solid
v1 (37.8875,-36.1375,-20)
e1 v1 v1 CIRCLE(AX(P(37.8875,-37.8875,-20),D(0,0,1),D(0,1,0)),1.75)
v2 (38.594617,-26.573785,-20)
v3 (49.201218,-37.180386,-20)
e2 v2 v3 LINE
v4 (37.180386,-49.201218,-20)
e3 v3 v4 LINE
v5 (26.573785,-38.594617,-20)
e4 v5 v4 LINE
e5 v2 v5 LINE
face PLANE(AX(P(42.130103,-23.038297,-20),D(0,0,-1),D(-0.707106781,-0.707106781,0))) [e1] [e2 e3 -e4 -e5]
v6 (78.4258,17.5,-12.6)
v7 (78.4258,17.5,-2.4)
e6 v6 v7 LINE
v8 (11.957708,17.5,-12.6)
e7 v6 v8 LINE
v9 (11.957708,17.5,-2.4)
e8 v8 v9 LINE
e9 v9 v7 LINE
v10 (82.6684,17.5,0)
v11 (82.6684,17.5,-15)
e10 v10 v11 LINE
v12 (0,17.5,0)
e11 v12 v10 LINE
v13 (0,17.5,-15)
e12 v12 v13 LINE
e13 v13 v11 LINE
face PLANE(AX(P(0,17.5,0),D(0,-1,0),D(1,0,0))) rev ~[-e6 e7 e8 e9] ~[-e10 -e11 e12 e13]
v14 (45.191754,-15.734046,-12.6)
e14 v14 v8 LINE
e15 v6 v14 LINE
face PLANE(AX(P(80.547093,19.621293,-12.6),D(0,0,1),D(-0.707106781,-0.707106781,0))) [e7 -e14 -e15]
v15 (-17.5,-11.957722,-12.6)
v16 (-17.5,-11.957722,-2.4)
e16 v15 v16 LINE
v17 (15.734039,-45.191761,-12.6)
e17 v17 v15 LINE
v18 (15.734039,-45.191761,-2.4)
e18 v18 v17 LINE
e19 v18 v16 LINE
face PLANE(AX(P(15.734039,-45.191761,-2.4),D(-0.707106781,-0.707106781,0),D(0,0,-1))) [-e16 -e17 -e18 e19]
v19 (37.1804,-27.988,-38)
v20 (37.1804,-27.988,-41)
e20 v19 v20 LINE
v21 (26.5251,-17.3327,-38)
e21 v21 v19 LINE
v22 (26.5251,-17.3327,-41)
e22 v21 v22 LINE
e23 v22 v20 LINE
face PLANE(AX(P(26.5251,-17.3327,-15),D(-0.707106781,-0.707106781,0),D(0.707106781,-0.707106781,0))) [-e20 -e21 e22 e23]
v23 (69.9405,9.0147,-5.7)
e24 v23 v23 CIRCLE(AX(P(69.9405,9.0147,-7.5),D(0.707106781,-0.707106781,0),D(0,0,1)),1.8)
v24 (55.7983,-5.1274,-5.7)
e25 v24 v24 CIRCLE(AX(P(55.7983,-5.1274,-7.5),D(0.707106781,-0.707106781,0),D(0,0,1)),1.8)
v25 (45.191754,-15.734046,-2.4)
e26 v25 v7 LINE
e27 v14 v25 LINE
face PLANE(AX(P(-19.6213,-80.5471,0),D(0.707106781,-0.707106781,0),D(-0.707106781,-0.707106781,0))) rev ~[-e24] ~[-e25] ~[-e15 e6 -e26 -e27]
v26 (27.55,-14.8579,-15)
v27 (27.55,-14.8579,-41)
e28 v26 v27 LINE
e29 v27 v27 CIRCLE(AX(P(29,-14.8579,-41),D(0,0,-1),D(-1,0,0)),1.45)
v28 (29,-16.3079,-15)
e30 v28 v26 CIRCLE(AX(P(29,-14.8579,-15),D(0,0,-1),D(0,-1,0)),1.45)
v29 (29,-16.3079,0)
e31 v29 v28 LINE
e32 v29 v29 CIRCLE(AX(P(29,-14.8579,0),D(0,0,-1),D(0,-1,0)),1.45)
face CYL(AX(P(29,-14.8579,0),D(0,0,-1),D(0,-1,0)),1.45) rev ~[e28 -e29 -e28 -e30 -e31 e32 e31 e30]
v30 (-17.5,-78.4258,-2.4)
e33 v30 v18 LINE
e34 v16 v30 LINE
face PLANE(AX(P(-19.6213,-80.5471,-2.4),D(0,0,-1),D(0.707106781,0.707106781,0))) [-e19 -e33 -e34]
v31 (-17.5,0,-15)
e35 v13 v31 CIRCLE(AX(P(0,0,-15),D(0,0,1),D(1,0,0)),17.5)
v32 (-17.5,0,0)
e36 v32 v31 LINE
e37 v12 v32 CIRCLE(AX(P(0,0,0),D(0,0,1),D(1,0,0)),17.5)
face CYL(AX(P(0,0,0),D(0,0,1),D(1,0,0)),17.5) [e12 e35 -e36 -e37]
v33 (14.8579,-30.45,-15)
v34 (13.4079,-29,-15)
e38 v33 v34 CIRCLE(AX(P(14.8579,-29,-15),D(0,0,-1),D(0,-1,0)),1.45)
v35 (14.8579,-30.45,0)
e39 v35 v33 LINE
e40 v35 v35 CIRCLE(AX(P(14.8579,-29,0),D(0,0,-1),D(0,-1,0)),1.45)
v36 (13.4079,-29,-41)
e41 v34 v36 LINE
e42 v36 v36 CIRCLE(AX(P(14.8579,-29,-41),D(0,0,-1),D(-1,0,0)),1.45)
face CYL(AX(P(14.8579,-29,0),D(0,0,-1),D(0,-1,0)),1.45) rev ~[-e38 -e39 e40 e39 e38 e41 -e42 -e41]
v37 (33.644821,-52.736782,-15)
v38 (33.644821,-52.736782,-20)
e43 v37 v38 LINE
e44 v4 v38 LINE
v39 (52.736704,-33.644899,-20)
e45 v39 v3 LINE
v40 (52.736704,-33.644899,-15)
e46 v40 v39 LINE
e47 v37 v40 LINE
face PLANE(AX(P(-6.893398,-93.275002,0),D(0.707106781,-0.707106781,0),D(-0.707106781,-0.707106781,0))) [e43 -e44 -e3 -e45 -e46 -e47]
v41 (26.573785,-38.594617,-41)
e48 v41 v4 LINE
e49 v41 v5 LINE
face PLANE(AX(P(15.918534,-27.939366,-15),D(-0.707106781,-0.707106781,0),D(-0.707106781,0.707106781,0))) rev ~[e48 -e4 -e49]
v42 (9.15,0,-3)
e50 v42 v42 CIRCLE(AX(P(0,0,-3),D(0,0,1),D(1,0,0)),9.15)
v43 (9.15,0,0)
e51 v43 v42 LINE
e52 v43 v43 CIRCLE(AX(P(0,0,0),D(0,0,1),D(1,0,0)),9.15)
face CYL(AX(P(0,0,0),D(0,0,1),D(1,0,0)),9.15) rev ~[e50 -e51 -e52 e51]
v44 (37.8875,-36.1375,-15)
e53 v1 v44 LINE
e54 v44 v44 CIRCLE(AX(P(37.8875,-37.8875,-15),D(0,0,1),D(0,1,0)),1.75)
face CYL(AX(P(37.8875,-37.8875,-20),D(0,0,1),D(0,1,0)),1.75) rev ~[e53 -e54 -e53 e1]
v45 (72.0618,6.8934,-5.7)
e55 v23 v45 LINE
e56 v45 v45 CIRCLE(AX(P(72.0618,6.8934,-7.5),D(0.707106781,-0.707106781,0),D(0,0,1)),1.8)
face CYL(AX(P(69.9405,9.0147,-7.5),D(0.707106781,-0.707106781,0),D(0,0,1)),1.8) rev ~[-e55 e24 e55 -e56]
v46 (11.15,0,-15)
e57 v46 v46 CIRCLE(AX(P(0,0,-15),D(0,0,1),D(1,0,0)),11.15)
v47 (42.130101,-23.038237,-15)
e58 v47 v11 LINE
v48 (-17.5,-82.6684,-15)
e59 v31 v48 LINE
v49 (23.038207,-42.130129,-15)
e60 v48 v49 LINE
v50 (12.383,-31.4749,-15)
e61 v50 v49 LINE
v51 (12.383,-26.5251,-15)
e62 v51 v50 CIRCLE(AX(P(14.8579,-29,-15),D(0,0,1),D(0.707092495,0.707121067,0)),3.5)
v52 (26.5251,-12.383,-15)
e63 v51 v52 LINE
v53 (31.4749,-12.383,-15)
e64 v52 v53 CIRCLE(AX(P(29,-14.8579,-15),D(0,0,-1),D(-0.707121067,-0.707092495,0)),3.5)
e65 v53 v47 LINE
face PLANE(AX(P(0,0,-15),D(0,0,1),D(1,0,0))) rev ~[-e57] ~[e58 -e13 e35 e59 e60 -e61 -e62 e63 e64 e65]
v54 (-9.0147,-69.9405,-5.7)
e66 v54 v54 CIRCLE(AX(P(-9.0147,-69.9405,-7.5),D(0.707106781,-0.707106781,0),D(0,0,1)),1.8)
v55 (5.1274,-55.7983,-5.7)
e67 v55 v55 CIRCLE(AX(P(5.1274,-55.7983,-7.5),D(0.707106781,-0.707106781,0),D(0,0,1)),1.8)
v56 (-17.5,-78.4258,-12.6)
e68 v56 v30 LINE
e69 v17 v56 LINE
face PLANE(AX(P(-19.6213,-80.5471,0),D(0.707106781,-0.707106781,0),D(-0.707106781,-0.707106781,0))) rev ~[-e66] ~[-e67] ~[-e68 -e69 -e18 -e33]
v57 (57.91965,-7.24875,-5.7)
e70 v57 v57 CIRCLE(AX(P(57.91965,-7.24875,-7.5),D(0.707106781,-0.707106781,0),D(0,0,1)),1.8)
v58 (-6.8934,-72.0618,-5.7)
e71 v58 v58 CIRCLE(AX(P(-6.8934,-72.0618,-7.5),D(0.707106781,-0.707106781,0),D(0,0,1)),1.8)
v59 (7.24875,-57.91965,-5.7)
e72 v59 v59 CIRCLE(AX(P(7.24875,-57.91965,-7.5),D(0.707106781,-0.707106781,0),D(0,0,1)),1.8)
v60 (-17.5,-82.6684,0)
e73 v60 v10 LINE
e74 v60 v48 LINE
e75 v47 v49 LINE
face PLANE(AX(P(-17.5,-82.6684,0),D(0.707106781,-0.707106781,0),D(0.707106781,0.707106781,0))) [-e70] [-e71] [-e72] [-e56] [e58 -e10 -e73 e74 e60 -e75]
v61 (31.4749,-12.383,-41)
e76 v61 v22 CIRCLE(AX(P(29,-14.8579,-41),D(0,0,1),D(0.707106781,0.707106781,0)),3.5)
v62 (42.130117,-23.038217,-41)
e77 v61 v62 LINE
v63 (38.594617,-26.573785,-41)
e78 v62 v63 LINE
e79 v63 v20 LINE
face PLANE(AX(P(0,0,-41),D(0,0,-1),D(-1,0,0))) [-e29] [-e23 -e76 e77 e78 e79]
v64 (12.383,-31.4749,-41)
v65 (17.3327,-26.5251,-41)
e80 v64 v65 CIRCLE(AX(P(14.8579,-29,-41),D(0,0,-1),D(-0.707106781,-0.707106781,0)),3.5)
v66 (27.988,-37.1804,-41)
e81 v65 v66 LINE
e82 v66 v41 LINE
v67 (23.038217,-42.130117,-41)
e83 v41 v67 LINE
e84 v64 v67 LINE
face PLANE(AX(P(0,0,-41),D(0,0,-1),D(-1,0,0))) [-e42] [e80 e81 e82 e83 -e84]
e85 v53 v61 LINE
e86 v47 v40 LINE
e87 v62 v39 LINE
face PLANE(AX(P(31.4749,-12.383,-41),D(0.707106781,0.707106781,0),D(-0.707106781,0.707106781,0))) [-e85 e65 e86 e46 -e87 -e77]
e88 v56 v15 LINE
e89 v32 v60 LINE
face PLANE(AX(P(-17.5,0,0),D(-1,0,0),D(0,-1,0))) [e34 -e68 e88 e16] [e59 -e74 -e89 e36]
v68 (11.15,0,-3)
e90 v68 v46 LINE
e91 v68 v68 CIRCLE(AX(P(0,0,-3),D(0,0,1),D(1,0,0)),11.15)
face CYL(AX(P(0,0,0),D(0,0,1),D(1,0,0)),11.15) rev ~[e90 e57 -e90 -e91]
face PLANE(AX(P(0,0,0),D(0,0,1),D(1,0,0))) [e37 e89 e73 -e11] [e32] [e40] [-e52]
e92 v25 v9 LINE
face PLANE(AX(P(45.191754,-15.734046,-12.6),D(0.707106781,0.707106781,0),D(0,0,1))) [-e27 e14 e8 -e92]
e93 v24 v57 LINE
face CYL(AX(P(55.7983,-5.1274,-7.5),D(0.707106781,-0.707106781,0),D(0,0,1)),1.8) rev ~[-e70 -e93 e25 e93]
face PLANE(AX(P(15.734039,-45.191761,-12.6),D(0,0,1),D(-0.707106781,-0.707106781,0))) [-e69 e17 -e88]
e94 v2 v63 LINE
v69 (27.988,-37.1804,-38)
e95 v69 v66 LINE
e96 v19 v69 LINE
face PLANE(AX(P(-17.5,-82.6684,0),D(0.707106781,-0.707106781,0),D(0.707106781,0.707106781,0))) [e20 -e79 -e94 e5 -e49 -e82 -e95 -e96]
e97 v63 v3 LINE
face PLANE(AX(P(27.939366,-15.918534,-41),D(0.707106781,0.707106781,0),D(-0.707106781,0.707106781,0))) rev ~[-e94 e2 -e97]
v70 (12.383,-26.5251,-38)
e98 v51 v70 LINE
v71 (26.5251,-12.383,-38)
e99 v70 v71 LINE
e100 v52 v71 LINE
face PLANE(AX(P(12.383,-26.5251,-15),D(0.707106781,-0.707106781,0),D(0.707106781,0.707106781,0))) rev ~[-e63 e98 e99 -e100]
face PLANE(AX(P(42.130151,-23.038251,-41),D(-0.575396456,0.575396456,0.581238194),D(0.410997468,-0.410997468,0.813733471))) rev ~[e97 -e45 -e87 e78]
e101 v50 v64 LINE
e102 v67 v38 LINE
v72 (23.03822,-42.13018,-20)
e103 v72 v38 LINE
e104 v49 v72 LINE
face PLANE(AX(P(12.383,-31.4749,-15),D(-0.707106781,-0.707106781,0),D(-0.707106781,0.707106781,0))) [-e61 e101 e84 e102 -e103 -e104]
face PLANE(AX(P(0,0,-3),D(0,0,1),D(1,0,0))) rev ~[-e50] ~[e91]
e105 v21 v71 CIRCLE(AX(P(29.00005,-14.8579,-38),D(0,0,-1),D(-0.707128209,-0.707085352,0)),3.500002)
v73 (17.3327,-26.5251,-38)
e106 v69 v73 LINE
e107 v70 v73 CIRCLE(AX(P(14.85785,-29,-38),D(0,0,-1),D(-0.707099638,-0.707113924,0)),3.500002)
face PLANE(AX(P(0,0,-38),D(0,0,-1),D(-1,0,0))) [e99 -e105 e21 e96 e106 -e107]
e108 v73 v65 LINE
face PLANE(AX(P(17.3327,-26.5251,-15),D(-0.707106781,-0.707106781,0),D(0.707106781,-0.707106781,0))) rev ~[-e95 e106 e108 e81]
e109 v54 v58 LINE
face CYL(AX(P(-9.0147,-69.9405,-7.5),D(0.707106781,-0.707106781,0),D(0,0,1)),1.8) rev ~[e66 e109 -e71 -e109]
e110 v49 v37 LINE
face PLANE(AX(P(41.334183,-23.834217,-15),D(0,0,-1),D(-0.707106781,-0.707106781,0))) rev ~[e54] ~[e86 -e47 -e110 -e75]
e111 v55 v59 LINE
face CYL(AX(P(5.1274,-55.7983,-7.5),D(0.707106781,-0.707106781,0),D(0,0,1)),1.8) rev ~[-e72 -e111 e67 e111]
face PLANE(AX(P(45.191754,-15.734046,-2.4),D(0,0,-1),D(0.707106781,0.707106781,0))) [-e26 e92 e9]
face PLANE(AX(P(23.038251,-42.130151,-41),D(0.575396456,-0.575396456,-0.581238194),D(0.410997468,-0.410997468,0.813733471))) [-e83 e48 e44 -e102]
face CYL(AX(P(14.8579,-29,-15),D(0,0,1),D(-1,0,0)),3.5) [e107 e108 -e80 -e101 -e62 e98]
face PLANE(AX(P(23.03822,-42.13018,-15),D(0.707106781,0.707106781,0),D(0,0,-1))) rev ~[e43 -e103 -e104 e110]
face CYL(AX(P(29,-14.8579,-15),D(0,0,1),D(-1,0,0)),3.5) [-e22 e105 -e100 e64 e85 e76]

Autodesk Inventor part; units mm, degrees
ref_plane "YZ Plane" through (0, 0, 0) normal (1, 0, 0) x (0, 1, 0)
ref_plane "XZ Plane" through (0, 0, 0) normal (0, 1, 0) x (-1, 0, 0)
ref_plane "XY Plane" through (0, 0, 0) normal (0, 0, 1) x (1, 0, 0)
sketch "Sketch1" plane through (0, 0, 0) normal (0, 0, 1) x (1, 0, 0)
  circle A0 centre (0, 0) radius 4 projected
  line L0 (-144.1925, -209.3609) -> (209.3609, 144.1925) projected
  circle A1 centre (0, 0) radius 11.15
  circle A2 centre (0, 0) radius 17.5
  line L1 (-17.5, 0) -> (-17.5, -82.6684)
  line L2 (0, 17.5) -> (82.6684, 17.5)
  point P0 (0, 0)
  dimension "d0" = 22.3
  dimension "d1" = 35
extrude "Extrusion1" add sketch "Sketch1" against normal blind 15 contours L1 A2 L2 L0 | A2
sketch "Sketch2" plane through (0, 0, 0) normal (0, 0, 1) x (1, 0, 0)
  arc A0 (0, 17.5) -> (-17.5, 0) centre (0, 0) ccw projected
  line L0 (-17.5, 0) -> (-17.5, -82.6684) projected
  line L1 (-17.5, -82.6684) -> (82.6684, 17.5) projected
  line L2 (82.6684, 17.5) -> (0, 17.5) projected
  circle A1 centre (0, 0) radius 11.15 projected
  circle A2 centre (0, 0) radius 9.15
  dimension "d6" = 2
extrude "Extrusion2" add sketch "Sketch2" against normal blind 3 contours A1
ref_plane "Work Plane1" through (-19.6213, -80.5471, 0) normal (0.7071068, -0.7071068, 0) x (-0.7071068, -0.7071068, 0)
sketch "Sketch3" plane through (-19.6213, -80.5471, 0) normal (0.7071068, -0.7071068, 0) x (-0.7071068, -0.7071068, 0)
  line L0 (-141.6595, 0) -> (-83.2041, 0) projected
  line L1 (-141.6595, 0) -> (-141.6595, 15) projected
  line L2 (-83.2041, 15) -> (-141.6595, 15) projected
  line L3 (-83.2041, 0) -> (-83.2041, 15) projected
  line L4 (-58.4554, 0) -> (0, 0) projected
  line L5 (-58.4554, 0) -> (-58.4554, 15) projected
  line L6 (0, 15) -> (-58.4554, 15) projected
  line L7 (0, 0) -> (0, 15) projected
  line L8 (-83.2041, 0) -> (-58.4554, 0) projected
  line L9 (-50.8297, 15) -> (-90.8297, 15) projected
  line L10 (-141.6595, 0) -> (-141.6595, 15) projected
  line L11 (-141.6595, 12.6) -> (-91.6595, 12.6)
  line L12 (-91.6595, 12.6) -> (-91.6595, 2.4)
  line L13 (-91.6595, 2.4) -> (-141.6595, 2.4)
  line L14 (-141.6595, 2.4) -> (-141.6595, 12.6)
  line L15 (0, 0) -> (0, 15) projected
  line L16 (0, 2.4) -> (-50, 2.4)
  line L17 (-50, 2.4) -> (-50, 12.6)
  line L18 (-50, 12.6) -> (0, 12.6)
  line L19 (0, 12.6) -> (0, 2.4)
  point P0 (-70.8297, 0)
  point P1 (0, 12.6)
  dimension "d8" = 2.4
  dimension "d9" = 2.4
  dimension "d10" = 2.4
  dimension "d11" = 50
extrude "Extrusion3" cut sketch "Sketch3" against normal through all contours L1 L11 L12 L13 | L16 L17 L18 L7
sketch "Sketch4" plane through (-19.6213, -80.5471, 0) normal (-0.7071068, 0.7071068, 0) x (0, 0, 1)
  line L0 (-12.6, 138.6595) -> (-2.4, 138.6595) projected
  line L1 (-12.6, 91.6595) -> (-12.6, 138.6595) projected
  line L2 (-2.4, 91.6595) -> (-12.6, 91.6595) projected
  line L3 (-2.4, 138.6595) -> (-2.4, 91.6595) projected
  line L4 (-2.4, 3) -> (-12.6, 3) projected
  line L5 (-2.4, 50) -> (-2.4, 3) projected
  line L6 (-12.6, 50) -> (-2.4, 50) projected
  line L7 (-12.6, 3) -> (-12.6, 50) projected
  line L8 (-12.6, 50) -> (-2.4, 50) projected
  line L9 (-2.4, 91.6595) -> (-12.6, 91.6595) projected
  point P0 (0, 70.8297)
  point P1 (-7.5, 106.6595)
  point P2 (-7.5, 126.6595)
  point P3 (-7.5, 35)
  point P4 (-7.5, 15)
  point P5 (-7.5, 50)
  point P6 (-7.5, 91.6595)
  dimension "d14" = 15
  dimension "d15" = 15
  dimension "d16" = 20
  dimension "d17" = 20
hole "Hole1" at (55.7983, -5.1274, -7.5) at (69.9405, 9.0147, -7.5) at (5.1274, -55.7983, -7.5) at (-9.0147, -69.9405, -7.5) direction (0.7071068, -0.7071068, 0) diameter 3.6 end through all clearance for "Hex Head Cap Screw DIN EN 24017" size "M3" standard "DIN"
sketch "Sketch5" plane through (0, 0, 0) normal (0, 0, 1) x (1, 0, 0)
  circle A0 centre (0, 0) radius 9.15 projected
  arc A1 (0, 17.5) -> (-17.5, 0) centre (0, 0) ccw projected
  line L0 (-17.5, 0) -> (-17.5, -82.6684) projected
  line L1 (-17.5, -82.6684) -> (82.6684, 17.5) projected
  line L2 (82.6684, 17.5) -> (0, 17.5) projected
  line L3 (29, -14.8579) -> (14.8579, -29) construction
  dimension "d25" = 29
  dimension "d26" = 29
  dimension "d27" = 20
hole "Hole2" at (29, -14.8579, 0) at (14.8579, -29, 0) direction (0, 0, -1) diameter 2.9 end through all
sketch "Sketch6" plane through (0, 0, -15) normal (0, 0, -1) x (-1, 0, 0)
  circle A0 centre (-29, -14.8579) radius 1.45 projected
  circle A1 centre (-14.8579, -29) radius 1.45 projected
  arc A2 (17.5, 0) -> (0, 17.5) centre (0, 0) ccw projected
  line L0 (0, 17.5) -> (-82.6684, 17.5) projected
  line L1 (-82.6684, 17.5) -> (17.5, -82.6684) projected
  line L2 (17.5, -82.6684) -> (17.5, 0) projected
  circle A3 centre (0, 0) radius 11.15 projected
  circle A4 centre (-14.8579, -29) radius 1.45 projected
  circle A5 centre (-14.8579, -29) radius 3.5
  circle A6 centre (-29, -14.8579) radius 1.45 projected
  circle A7 centre (-29, -14.8579) radius 3.5
  line L3 (-12.383, -31.4749) -> (-23.0382, -42.1301)
  line L4 (-17.3327, -26.5251) -> (-27.988, -37.1804)
  line L5 (-82.6684, 17.5) -> (17.5, -82.6684) projected
  line L6 (-31.4749, -12.383) -> (-42.1301, -23.0382)
  line L7 (-26.5251, -17.3327) -> (-37.1804, -27.988)
  point P0 (0, 0)
  dimension "d35" = 7
extrude "Extrusion4" add sketch "Sketch6" along normal blind 26 contours L1 L4 A5 L3 | L6 A7 L7 L1 | A5 | A7
sketch "Sketch7" plane through (0, 0, -15) normal (0, 0, -1) x (-1, 0, 0)
  line L0 (-26.5251, -17.3327) -> (-37.1804, -27.988) projected
  line L1 (-37.1804, -27.988) -> (-27.988, -37.1804) projected
  line L2 (-27.988, -37.1804) -> (-17.3327, -26.5251) projected
  arc A0 (-12.383, -31.4749) -> (-17.3327, -26.5251) centre (-14.8579, -29) ccw projected
  line L3 (-12.383, -31.4749) -> (-23.0382, -42.1301) projected
  line L4 (-23.0382, -42.1301) -> (17.5, -82.6684) projected
  line L5 (17.5, -82.6684) -> (17.5, 0) projected
  arc A1 (17.5, 0) -> (0, 17.5) centre (0, 0) ccw projected
  line L6 (0, 17.5) -> (-82.6684, 17.5) projected
  line L7 (-82.6684, 17.5) -> (-42.1301, -23.0382) projected
  line L8 (-42.1301, -23.0382) -> (-31.4749, -12.383) projected
  arc A2 (-26.5251, -17.3327) -> (-31.4749, -12.383) centre (-29, -14.8579) ccw projected
  circle A3 centre (0, 0) radius 11.15 projected
  line L9 (-12.383, -26.5251) -> (-26.5251, -12.383)
  arc A4 (-26.5251, -17.3327) -> (-31.4749, -12.383) centre (-29, -14.8579) ccw projected
  point P0 (0, 0)
extrude "Extrusion5" add sketch "Sketch7" along normal blind 23 contours A2 L9 A0 L2 L1 L0
sketch "Sketch8" plane through (-17.5, -82.6684, 0) normal (0.7071068, -0.7071068, 0) x (-0.7071068, -0.7071068, 0)
  circle A0 centre (-35, 7.5) radius 1.8 projected
  circle A1 centre (-106.6595, 7.5) radius 1.8 projected
  circle A2 centre (-126.6595, 7.5) radius 1.8 projected
  circle A3 centre (-15, 7.5) radius 1.8 projected
  line L0 (0, 0) -> (-141.6595, 0) projected
  line L1 (0, 0) -> (0, 15) projected
  line L2 (-57.3297, 15) -> (0, 15) projected
  line L3 (-57.3297, 15) -> (-57.3297, 41) projected
  line L4 (-64.3297, 41) -> (-57.3297, 41) projected
  line L5 (-64.3297, 38) -> (-64.3297, 41) projected
  line L6 (-77.3297, 38) -> (-64.3297, 38) projected
  line L7 (-77.3297, 38) -> (-77.3297, 41) projected
  line L8 (-84.3297, 41) -> (-77.3297, 41) projected
  line L9 (-84.3297, 15) -> (-84.3297, 41) projected
  line L10 (-141.6595, 15) -> (-84.3297, 15) projected
  line L11 (-141.6595, 0) -> (-141.6595, 15) projected
  line L12 (-84.3297, 15) -> (-57.3297, 15)
  line L13 (-83.2041, 15) -> (-141.6595, 15) projected
  line L14 (-84.3297, 15) -> (-84.3297, 41) projected
  line L15 (-84.3297, 20) -> (-57.3297, 20)
  point P0 (-70.8297, 0)
  dimension "d40" = 5
extrude "Extrusion6" add sketch "Sketch8" along normal blind 15 contours L12 L9 L15 L3
sketch "Sketch9" plane through (31.4749, -12.383, -41) normal (0.7071068, 0.7071068, 0) x (-0.7071068, 0.7071068, 0)
  line L0 (-15.0688, 26) -> (0, 26) projected
  line L1 (-15.0688, 26) -> (-30.0688, 26) projected
  line L2 (-30.0688, 21) -> (-30.0688, 26) projected
  line L3 (-15.0688, 21) -> (-30.0688, 21) projected
  line L4 (-15.0688, 21) -> (-15.0688, 0) projected
  line L5 (0, 0) -> (-15.0688, 0) projected
  line L6 (0, 26) -> (0, 0) projected
  line L7 (-15.0688, 0) -> (-30.0688, 21)
  point P0 (31.0122, 41)
extrude "Extrusion7" add sketch "Sketch9" against normal blind 5 contours L3 L4 L7
sketch "Sketch10" plane through (12.383, -31.4749, -15) normal (-0.7071068, -0.7071068, 0) x (-0.7071068, 0.7071068, 0)
  line L0 (-15.0688, 26) -> (-30.0688, 5) projected
  line L1 (-15.0688, 5) -> (-30.0688, 5) projected
  line L2 (-15.0688, 26) -> (-15.0688, 5) projected
  point P0 (31.0122, -15)
extrude "Extrusion8" add sketch "Sketch10" against normal blind 5
sketch "Sketch11" plane through (49.2012, -37.1804, -20) normal (0, 0, -1) x (-0.7071068, -0.7071068, 0)
  line L0 (17, 0) -> (17, 15) projected
  line L1 (0, 15) -> (17, 15) projected
  line L2 (0, 15) -> (0, 0) projected
  line L3 (17, 0) -> (0, 0) projected
  line L4 (2, 15) -> (15, 15) projected
  point P0 (8.5, 61.081)
  point P1 (8.5, 7.5)
  point P2 (0, 7.5)
  point P3 (8.5, 15)
hole "Hole3" at (37.8875, -37.8875, -20) direction (0, 0, 1) diameter 3.5 end through all
equation "\"d9\" = d8"
equation "\"d10\" = d8"
equation "\"d15\" = d14"
equation "\"d17\" = d16"
equation "\"d26\" = d25"
properties part number "Rear Z Axis Bottom Bearing" material "ABS Plastic"
